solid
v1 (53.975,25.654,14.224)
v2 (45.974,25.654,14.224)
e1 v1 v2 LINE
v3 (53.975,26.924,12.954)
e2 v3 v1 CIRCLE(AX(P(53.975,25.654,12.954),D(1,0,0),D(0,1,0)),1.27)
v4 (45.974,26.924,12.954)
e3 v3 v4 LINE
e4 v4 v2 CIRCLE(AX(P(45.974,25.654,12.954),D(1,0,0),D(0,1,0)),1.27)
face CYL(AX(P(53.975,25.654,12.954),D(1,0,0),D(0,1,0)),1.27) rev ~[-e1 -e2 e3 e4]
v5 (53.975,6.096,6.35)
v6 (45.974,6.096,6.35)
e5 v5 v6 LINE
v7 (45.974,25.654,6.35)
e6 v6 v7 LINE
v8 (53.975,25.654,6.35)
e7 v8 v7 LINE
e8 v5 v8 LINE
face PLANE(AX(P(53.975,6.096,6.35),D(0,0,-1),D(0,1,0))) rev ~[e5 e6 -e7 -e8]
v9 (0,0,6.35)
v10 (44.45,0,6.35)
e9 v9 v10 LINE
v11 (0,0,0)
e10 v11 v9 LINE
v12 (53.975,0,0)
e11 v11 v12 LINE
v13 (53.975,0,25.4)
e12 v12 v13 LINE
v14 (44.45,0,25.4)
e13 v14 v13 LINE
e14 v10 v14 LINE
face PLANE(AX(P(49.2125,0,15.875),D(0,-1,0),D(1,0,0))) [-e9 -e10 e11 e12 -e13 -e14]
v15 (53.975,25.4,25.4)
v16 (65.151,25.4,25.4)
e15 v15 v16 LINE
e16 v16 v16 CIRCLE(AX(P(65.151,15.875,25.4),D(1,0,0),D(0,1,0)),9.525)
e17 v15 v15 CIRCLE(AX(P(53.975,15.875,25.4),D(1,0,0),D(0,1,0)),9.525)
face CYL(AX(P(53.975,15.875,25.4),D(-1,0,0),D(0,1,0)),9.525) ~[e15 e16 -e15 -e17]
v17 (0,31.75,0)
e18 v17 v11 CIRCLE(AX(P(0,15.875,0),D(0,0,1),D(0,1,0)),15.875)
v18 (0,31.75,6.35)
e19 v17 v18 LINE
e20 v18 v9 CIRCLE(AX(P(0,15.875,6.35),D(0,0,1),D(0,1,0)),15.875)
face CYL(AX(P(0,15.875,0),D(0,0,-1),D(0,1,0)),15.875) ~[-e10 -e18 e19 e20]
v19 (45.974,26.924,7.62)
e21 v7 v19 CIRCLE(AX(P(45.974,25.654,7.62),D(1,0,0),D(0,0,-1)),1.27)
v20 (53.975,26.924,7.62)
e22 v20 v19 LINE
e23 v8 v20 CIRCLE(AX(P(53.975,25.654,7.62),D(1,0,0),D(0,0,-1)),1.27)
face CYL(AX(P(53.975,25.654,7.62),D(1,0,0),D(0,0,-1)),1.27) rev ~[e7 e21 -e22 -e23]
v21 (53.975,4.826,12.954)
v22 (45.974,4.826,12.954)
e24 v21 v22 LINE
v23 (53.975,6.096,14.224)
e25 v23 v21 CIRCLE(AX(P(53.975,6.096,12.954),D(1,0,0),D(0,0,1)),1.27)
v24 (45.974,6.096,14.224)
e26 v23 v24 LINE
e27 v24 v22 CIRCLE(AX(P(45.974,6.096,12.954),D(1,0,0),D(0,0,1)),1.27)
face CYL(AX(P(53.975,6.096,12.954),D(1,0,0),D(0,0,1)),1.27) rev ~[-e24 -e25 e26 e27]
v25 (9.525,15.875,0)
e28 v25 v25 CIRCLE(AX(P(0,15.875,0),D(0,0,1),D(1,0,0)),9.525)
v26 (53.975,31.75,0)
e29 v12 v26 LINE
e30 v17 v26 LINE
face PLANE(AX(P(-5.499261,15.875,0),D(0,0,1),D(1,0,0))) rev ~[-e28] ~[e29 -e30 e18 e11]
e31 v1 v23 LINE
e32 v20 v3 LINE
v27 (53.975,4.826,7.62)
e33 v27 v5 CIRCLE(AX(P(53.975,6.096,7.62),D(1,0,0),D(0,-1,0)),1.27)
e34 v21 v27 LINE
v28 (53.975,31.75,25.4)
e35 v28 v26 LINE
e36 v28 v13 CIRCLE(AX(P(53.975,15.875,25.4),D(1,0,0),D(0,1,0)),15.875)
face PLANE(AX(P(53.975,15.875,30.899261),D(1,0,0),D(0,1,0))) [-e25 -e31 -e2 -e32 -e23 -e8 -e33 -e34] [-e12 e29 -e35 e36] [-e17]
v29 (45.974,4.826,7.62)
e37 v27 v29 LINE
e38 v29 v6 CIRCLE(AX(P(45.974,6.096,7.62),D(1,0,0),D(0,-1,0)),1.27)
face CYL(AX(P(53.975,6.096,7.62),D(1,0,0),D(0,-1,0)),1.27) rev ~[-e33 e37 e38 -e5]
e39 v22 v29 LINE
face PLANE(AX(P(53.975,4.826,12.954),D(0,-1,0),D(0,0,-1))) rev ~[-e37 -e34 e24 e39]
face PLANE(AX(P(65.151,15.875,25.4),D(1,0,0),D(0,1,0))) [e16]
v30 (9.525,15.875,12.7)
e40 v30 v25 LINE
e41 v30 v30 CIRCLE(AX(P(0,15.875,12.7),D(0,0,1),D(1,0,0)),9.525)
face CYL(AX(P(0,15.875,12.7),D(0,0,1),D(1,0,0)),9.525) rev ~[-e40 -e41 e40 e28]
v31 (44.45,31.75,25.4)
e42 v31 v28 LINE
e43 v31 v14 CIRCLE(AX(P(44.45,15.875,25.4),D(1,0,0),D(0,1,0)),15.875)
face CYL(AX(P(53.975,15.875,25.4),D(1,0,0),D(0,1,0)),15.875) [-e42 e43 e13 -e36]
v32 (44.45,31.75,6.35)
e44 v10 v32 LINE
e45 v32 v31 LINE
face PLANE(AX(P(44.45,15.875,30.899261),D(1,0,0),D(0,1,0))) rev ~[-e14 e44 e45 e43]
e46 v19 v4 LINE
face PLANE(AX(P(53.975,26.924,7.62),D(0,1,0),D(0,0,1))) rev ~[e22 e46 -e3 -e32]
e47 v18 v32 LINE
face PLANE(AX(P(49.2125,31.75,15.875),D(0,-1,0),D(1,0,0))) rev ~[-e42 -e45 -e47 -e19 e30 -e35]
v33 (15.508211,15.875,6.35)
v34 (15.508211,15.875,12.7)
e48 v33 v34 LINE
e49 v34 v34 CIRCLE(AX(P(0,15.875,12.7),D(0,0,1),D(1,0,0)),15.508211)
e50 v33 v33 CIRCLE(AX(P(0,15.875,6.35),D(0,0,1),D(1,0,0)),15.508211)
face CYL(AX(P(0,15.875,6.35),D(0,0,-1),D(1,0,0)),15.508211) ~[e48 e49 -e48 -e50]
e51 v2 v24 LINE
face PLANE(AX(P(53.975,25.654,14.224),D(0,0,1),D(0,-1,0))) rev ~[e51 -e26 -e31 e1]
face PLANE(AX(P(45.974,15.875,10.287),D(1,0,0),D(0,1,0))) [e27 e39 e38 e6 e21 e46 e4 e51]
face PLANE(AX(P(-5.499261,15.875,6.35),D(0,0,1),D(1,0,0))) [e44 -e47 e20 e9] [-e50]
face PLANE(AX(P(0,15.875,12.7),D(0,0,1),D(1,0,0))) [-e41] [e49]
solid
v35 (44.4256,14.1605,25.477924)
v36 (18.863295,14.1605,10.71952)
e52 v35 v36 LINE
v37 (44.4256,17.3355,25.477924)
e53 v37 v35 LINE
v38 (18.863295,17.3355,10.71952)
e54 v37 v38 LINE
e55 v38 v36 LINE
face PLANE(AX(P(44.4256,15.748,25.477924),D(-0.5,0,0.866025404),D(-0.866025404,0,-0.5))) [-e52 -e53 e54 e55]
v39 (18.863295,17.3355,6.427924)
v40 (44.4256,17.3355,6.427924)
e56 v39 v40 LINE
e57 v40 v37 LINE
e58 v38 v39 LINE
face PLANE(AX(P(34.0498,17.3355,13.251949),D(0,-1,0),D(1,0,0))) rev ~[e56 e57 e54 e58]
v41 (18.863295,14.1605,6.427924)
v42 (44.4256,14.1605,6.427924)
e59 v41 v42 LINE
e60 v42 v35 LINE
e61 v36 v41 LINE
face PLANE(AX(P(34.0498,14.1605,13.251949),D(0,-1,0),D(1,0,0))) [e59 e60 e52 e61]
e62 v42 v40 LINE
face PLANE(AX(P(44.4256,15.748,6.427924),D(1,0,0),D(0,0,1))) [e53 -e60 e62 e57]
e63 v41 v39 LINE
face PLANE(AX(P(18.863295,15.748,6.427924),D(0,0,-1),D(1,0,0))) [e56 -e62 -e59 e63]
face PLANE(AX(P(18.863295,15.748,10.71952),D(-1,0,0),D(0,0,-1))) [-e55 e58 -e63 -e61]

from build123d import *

# Parameters (mm, degrees)
F0_W      = 53.975
F0_H      = 31.75
F1_DEPTH  = 6.35
F2_R      = 15.5082112309
F3_DEPTH  = 6.35
F4_R      = 9.525
F5_DEPTH  = 12.7
F6_W      = 9.525
F6_H      = 19.05
F7_DEPTH  = 31.75
F9_DEPTH  = 9.525
F10_R     = 9.525
F11_DEPTH = 11.176
F13_DEPTH = 8.001
F16_DEPTH = 1.5875


# Not quite as in the source:
# - the program builds the solid bodies; features that only make, move or delete a surface that nothing else refers to are left out


with BuildPart() as f1:
    # F0 (on Top) → F1 (new body)
    with BuildSketch(Plane.XY):
        with BuildLine():
            ThreePointArc((0, 31.75), (-15.875, 15.875), (0, 0))
            Line((0, 0), (0, 31.75))
        make_face()
        with Locations((26.9875, 15.875)):
            Rectangle(F0_W, F0_H)
    extrude(amount=F1_DEPTH)

    # F2 (on face) → F3 (join)
    with BuildSketch(Plane.XY.offset(6.35)):
        with Locations((0, 15.875)):
            Circle(F2_R)
    extrude(amount=F3_DEPTH)

    # F4 (on face) → F5 (cut)
    with BuildSketch(Plane.XY.offset(12.7)):
        with Locations((0, 15.875)):
            Circle(F4_R)
    extrude(amount=-F5_DEPTH, mode=Mode.SUBTRACT)

    # F6 (on face) → F7 (join)
    with BuildSketch(Plane.XZ):
        with Locations((49.2125, 15.875)):
            Rectangle(F6_W, F6_H)
    extrude(amount=-F7_DEPTH)

    # F8 (on face) → F9 (join)
    with BuildSketch(Plane.YZ.offset(53.975)):
        with BuildLine():
            Line((0, 25.4), (31.75, 25.4))
            ThreePointArc((31.75, 25.4), (15.875, 41.275), (0, 25.4))
        make_face()
    extrude(amount=-F9_DEPTH)

    # F10 (on face) → F11 (join)
    with BuildSketch(Plane.YZ.offset(53.975)):
        with Locations((15.875, 25.4)):
            Circle(F10_R)
    extrude(amount=F11_DEPTH)

    # F12 (on face) → F13 (cut)
    with BuildSketch(Plane.YZ.offset(53.975)):
        with BuildLine():
            Line((25.654, 14.224), (6.096, 14.224))
            ThreePointArc((6.096, 14.224), (5.1979743879, 13.8520256121), (4.826, 12.954))
            Line((4.826, 12.954), (4.826, 7.62))
            ThreePointArc((4.826, 7.62), (5.1979743879, 6.7219743879), (6.096, 6.35))
            Line((6.096, 6.35), (25.654, 6.35))
            ThreePointArc((25.654, 6.35), (26.5520256121, 6.7219743879), (26.924, 7.62))
            Line((26.924, 7.62), (26.924, 12.954))
            ThreePointArc((26.924, 12.954), (26.5520256121, 13.8520256121), (25.654, 14.224))
        make_face()
    extrude(amount=-F13_DEPTH, mode=Mode.SUBTRACT)


with BuildPart() as f16:
    # F15 (on offset) → F16 (new body, symmetric)
    with BuildSketch(Plane.XZ.offset(-15.748)):
        Polygon((44.4256004055, 6.4279241487), (44.4256004055, 25.4779241487), (18.863295002, 10.719520243), (18.863295002, 6.4279241487), align=None)
    extrude(amount=F16_DEPTH, both=True)


solid = Compound([f1.part, f16.part])
